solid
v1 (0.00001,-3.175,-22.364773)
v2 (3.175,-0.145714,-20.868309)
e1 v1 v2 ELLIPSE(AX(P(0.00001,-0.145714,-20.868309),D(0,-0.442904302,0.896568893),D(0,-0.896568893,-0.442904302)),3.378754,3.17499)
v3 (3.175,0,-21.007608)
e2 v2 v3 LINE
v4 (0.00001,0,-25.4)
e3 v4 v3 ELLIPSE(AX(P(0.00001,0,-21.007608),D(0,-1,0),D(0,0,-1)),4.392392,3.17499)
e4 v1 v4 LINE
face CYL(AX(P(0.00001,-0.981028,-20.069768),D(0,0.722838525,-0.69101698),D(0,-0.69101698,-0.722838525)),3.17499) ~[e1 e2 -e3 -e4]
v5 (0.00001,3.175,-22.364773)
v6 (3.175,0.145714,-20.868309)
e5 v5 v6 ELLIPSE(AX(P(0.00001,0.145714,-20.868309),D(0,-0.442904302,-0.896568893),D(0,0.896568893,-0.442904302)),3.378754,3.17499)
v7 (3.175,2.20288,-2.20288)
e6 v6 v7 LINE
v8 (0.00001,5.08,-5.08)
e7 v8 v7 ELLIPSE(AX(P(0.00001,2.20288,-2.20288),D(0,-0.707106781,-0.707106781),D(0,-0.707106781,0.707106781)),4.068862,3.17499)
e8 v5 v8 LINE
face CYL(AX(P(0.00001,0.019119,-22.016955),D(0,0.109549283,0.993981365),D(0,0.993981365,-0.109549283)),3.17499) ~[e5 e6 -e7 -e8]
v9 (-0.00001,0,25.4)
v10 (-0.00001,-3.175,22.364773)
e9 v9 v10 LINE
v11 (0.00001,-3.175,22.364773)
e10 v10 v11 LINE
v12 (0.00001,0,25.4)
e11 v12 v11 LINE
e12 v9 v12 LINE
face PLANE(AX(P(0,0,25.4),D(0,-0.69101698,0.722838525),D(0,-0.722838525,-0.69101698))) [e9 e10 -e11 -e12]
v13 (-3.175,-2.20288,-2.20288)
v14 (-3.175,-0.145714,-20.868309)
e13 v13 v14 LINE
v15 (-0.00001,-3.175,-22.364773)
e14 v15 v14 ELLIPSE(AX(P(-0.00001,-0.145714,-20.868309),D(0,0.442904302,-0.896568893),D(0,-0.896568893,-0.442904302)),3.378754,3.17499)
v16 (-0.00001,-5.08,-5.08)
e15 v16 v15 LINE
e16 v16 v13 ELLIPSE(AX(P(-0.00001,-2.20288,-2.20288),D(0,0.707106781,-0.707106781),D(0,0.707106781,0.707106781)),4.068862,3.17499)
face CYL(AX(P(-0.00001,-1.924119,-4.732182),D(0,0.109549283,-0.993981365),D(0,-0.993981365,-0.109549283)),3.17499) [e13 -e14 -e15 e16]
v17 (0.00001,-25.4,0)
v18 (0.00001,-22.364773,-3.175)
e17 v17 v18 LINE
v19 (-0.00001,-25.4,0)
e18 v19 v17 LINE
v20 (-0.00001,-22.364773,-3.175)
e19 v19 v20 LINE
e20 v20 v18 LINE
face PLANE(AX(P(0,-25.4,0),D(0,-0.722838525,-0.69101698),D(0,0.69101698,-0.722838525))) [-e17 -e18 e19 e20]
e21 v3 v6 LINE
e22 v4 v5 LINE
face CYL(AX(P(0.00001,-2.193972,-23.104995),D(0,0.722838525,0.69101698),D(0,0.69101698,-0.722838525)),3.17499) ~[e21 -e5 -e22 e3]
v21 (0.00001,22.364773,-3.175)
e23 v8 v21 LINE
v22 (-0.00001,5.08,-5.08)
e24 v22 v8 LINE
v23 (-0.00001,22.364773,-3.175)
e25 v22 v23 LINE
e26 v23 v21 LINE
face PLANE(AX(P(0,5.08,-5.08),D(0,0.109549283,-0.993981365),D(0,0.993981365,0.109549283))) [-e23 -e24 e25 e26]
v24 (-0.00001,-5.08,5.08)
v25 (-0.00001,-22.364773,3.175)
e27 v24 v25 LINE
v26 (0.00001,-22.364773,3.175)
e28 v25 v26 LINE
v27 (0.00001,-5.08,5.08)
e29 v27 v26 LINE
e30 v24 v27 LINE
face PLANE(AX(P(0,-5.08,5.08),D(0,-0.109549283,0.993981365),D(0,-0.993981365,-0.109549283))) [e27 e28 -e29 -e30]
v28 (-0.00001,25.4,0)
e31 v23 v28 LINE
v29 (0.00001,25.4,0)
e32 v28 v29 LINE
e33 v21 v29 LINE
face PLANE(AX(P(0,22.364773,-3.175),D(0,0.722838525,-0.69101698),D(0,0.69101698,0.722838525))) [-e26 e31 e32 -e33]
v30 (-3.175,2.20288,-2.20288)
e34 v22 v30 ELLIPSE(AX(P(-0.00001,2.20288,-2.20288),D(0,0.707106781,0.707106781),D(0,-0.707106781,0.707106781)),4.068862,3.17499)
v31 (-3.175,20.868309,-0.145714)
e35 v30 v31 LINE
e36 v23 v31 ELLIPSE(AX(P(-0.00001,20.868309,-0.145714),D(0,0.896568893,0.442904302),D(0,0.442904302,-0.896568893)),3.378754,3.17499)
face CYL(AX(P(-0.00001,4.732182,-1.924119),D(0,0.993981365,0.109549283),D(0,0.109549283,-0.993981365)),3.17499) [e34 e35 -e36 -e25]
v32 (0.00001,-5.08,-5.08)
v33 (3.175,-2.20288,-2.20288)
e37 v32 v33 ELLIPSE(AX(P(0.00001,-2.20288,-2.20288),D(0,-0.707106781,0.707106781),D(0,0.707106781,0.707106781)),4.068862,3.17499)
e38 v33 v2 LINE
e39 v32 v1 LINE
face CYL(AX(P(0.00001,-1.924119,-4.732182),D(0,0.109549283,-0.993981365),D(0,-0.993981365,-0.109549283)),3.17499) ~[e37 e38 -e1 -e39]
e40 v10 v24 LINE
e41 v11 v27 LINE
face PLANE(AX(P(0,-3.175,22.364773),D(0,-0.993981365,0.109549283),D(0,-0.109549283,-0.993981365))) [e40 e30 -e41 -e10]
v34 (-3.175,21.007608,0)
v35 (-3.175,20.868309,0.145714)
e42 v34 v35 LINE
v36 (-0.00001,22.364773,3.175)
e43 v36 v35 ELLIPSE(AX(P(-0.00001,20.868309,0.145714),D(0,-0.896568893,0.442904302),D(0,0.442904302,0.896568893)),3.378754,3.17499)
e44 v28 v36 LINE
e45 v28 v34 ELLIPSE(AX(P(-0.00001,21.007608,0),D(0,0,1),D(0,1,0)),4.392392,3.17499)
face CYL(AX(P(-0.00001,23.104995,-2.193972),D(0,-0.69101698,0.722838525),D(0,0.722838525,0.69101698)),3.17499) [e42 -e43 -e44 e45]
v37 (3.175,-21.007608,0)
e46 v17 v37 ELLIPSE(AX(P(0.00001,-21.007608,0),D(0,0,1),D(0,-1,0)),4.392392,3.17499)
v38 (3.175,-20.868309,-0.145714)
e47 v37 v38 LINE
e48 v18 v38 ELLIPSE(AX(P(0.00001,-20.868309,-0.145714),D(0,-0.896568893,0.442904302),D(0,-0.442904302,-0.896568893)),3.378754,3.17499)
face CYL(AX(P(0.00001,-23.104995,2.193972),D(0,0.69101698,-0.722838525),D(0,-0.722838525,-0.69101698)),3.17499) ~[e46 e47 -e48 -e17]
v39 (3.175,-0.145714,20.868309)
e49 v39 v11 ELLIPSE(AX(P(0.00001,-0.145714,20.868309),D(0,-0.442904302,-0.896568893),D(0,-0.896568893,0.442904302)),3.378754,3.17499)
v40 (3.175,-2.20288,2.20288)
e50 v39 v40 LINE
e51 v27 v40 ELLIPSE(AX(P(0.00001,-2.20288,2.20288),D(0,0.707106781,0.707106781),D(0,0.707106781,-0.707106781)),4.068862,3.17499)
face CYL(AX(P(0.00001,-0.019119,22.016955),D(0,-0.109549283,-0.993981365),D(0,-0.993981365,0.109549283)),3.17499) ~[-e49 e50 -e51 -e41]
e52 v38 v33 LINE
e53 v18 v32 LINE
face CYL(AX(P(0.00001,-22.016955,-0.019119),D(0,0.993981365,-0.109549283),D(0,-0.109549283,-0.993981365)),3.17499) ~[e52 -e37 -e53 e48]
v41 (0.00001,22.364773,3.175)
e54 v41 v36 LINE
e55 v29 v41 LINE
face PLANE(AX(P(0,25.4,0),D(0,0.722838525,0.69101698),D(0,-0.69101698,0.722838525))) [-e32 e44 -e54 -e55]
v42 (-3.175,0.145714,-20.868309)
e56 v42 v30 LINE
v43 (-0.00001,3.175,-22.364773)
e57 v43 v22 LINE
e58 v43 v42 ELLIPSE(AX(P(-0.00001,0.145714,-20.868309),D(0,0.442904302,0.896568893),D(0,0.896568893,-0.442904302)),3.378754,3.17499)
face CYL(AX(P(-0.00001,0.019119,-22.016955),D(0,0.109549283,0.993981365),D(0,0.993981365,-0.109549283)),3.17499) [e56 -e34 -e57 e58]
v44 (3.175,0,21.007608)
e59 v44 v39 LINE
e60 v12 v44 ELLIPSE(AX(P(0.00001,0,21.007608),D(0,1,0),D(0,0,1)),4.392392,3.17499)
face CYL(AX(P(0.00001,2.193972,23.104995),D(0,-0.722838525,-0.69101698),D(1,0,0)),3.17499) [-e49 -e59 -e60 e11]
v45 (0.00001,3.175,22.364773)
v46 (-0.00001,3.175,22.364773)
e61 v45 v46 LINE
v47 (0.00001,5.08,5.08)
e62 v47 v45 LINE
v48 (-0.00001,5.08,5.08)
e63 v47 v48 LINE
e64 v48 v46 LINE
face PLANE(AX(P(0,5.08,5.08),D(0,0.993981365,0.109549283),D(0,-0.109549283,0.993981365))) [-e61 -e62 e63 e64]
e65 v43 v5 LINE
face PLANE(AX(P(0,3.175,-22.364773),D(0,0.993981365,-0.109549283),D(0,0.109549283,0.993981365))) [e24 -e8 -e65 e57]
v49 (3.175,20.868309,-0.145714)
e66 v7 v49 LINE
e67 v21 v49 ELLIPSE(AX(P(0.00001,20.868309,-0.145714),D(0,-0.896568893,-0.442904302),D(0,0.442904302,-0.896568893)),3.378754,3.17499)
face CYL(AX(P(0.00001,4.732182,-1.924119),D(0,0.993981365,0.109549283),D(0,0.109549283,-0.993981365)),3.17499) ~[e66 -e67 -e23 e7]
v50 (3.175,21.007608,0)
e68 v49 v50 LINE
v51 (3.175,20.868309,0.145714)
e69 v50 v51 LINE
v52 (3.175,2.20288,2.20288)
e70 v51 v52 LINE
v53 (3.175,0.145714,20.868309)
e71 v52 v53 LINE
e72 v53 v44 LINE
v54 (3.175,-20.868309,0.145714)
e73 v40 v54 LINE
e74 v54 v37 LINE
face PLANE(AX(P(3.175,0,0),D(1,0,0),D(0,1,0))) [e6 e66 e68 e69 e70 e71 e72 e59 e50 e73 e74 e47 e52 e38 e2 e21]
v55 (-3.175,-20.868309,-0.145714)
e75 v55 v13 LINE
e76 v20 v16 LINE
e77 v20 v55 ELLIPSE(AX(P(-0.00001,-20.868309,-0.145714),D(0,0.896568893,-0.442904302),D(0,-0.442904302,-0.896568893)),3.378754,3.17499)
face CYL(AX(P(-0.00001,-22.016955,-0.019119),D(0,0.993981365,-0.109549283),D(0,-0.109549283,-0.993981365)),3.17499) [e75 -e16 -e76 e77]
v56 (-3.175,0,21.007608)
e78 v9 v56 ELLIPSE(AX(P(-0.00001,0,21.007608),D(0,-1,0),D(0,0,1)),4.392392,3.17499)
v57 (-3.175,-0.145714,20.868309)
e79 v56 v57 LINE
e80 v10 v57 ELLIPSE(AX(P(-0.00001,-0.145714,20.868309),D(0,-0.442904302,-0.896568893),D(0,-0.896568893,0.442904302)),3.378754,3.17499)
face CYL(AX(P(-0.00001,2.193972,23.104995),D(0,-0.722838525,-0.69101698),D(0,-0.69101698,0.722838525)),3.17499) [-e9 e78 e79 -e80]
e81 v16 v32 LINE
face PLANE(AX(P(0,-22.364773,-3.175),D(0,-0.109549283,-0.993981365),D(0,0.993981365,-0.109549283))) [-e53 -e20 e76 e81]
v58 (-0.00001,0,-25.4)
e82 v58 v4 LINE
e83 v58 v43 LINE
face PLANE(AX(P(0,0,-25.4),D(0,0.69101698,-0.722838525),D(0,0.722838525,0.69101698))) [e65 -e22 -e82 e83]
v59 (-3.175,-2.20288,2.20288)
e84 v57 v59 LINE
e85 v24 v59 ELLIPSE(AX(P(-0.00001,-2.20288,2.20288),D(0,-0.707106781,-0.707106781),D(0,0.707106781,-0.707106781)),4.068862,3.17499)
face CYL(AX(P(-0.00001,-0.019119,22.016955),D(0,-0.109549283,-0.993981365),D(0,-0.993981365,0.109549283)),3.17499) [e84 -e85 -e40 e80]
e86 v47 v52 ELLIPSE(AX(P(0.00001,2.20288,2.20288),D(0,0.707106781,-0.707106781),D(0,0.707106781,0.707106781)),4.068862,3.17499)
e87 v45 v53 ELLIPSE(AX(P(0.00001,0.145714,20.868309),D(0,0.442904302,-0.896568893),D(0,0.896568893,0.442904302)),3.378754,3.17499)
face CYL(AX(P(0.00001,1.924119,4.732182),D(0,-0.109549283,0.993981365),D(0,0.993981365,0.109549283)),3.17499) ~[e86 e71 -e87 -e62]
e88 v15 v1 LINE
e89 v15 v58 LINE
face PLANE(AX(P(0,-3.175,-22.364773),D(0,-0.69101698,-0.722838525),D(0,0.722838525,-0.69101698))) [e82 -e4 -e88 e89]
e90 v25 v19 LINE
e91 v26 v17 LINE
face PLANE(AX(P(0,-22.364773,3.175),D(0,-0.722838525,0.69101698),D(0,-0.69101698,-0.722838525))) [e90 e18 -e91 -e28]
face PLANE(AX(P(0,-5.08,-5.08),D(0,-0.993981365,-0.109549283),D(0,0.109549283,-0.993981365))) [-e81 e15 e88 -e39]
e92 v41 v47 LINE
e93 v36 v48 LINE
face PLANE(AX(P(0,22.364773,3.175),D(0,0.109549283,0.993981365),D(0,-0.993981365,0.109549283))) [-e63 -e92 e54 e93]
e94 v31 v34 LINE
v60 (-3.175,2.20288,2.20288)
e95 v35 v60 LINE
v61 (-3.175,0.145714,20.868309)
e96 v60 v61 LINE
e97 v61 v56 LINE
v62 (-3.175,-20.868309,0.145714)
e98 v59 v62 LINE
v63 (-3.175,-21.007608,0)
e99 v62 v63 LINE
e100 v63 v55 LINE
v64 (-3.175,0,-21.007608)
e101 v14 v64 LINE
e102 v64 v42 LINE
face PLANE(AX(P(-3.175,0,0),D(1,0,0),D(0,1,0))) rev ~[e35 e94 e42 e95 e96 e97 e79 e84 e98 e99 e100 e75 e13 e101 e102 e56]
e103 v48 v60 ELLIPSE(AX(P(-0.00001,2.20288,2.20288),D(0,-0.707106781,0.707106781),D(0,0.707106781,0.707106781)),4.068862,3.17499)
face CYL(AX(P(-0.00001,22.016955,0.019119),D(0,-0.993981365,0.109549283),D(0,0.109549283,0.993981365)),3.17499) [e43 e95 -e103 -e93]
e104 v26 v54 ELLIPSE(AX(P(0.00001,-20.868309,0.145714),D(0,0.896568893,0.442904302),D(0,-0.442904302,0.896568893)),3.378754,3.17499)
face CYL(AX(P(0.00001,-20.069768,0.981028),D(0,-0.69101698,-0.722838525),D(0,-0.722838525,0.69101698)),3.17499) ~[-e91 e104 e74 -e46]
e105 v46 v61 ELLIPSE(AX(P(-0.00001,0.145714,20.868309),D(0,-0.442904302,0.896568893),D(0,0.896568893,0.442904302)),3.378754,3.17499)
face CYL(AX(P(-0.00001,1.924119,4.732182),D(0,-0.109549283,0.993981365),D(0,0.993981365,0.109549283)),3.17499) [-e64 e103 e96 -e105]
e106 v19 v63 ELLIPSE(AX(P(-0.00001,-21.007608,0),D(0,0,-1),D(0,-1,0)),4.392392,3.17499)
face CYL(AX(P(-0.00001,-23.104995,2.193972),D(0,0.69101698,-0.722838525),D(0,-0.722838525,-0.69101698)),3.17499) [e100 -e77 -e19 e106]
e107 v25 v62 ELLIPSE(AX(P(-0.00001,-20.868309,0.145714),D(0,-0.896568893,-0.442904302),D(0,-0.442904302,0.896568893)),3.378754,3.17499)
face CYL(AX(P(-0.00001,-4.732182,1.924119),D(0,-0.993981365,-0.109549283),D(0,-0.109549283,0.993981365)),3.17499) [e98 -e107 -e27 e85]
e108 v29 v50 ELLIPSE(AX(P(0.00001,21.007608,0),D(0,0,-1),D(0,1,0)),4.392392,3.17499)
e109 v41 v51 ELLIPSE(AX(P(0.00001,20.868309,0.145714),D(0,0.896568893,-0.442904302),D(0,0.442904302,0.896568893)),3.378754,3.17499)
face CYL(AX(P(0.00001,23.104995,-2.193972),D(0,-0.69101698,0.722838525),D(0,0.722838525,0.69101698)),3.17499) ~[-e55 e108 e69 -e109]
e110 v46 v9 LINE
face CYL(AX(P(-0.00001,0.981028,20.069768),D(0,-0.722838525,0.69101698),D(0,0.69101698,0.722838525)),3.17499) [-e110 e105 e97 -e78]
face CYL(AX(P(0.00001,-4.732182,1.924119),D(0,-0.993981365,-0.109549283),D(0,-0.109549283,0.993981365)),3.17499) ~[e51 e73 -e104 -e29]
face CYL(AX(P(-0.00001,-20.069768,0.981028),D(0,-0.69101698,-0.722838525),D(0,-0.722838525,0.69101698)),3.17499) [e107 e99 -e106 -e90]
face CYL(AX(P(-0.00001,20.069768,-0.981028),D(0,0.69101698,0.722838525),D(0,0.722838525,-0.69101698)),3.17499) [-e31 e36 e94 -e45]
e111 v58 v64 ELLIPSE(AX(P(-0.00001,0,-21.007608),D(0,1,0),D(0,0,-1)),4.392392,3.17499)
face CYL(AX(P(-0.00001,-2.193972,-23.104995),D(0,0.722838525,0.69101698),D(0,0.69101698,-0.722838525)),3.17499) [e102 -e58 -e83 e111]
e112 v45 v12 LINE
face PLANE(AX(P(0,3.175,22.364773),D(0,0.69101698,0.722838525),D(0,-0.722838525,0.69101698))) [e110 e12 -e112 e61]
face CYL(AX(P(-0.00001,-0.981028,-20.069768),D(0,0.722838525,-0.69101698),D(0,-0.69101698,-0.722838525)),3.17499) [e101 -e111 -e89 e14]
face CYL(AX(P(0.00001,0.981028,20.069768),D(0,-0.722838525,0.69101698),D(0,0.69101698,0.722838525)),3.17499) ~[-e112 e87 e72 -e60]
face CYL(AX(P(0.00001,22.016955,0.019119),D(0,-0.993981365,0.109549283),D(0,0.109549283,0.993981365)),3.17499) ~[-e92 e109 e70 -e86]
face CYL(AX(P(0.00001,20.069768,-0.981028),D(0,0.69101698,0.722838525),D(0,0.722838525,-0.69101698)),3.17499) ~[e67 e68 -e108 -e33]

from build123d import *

# Parameters (mm, degrees)
F1_DEPTH = 3.175
F2_R     = 3.17499


# Not quite as in the source:
# - a fillet or chamfer is up to 0.001 mm smaller than in the source, because OpenCascade refuses the exact size


with BuildPart() as f1:
    # F0 (on Right) → F1 (new body, symmetric)
    with BuildSketch(Plane.YZ):
        Polygon((3.175, 22.364773135), (0, 25.4), (-3.175, 22.364773135), (-5.08, 5.08), (-22.364773135, 3.175), (-25.4, 0), (-22.364773135, -3.175), (-5.08, -5.08), (-3.175, -22.364773135), (0, -25.4), (3.175, -22.364773135), (5.08, -5.08), (22.364773135, -3.175), (25.4, 0), (22.364773135, 3.175), (5.08, 5.08), align=None)
    extrude(amount=F1_DEPTH, both=True)

    # F2 (radius 3.175 in the source; OpenCascade refuses exactly that, so slightly less here)
    f2_edges = [f1.edges().sort_by_distance(p)[0] for p in [
        (3.175, 4.1275, 13.722387),
        (3.175, 1.5875, 23.882387),
        (3.175, -1.5875, 23.882387),
        (3.175, -4.1275, 13.722387),
        (3.175, -13.722387, 4.1275),
        (3.175, -23.882387, 1.5875),
        (3.175, -23.882387, -1.5875),
        (3.175, -13.722387, -4.1275),
        (3.175, -4.1275, -13.722387),
        (3.175, -1.5875, -23.882387),
        (3.175, 1.5875, -23.882387),
        (3.175, 4.1275, -13.722387),
        (3.175, 13.722387, -4.1275),
        (3.175, 23.882387, -1.5875),
        (3.175, 23.882387, 1.5875),
        (3.175, 13.722387, 4.1275),
        (-3.175, 4.1275, 13.722387),
        (-3.175, 1.5875, 23.882387),
        (-3.175, -1.5875, 23.882387),
        (-3.175, -4.1275, 13.722387),
        (-3.175, -13.722387, 4.1275),
        (-3.175, -23.882387, 1.5875),
        (-3.175, -23.882387, -1.5875),
        (-3.175, -13.722387, -4.1275),
        (-3.175, -4.1275, -13.722387),
        (-3.175, -1.5875, -23.882387),
        (-3.175, 1.5875, -23.882387),
        (-3.175, 4.1275, -13.722387),
        (-3.175, 13.722387, -4.1275),
        (-3.175, 23.882387, -1.5875),
        (-3.175, 23.882387, 1.5875),
        (-3.175, 13.722387, 4.1275),
    ]]
    fillet(f2_edges, radius=F2_R)


solid = f1.part
